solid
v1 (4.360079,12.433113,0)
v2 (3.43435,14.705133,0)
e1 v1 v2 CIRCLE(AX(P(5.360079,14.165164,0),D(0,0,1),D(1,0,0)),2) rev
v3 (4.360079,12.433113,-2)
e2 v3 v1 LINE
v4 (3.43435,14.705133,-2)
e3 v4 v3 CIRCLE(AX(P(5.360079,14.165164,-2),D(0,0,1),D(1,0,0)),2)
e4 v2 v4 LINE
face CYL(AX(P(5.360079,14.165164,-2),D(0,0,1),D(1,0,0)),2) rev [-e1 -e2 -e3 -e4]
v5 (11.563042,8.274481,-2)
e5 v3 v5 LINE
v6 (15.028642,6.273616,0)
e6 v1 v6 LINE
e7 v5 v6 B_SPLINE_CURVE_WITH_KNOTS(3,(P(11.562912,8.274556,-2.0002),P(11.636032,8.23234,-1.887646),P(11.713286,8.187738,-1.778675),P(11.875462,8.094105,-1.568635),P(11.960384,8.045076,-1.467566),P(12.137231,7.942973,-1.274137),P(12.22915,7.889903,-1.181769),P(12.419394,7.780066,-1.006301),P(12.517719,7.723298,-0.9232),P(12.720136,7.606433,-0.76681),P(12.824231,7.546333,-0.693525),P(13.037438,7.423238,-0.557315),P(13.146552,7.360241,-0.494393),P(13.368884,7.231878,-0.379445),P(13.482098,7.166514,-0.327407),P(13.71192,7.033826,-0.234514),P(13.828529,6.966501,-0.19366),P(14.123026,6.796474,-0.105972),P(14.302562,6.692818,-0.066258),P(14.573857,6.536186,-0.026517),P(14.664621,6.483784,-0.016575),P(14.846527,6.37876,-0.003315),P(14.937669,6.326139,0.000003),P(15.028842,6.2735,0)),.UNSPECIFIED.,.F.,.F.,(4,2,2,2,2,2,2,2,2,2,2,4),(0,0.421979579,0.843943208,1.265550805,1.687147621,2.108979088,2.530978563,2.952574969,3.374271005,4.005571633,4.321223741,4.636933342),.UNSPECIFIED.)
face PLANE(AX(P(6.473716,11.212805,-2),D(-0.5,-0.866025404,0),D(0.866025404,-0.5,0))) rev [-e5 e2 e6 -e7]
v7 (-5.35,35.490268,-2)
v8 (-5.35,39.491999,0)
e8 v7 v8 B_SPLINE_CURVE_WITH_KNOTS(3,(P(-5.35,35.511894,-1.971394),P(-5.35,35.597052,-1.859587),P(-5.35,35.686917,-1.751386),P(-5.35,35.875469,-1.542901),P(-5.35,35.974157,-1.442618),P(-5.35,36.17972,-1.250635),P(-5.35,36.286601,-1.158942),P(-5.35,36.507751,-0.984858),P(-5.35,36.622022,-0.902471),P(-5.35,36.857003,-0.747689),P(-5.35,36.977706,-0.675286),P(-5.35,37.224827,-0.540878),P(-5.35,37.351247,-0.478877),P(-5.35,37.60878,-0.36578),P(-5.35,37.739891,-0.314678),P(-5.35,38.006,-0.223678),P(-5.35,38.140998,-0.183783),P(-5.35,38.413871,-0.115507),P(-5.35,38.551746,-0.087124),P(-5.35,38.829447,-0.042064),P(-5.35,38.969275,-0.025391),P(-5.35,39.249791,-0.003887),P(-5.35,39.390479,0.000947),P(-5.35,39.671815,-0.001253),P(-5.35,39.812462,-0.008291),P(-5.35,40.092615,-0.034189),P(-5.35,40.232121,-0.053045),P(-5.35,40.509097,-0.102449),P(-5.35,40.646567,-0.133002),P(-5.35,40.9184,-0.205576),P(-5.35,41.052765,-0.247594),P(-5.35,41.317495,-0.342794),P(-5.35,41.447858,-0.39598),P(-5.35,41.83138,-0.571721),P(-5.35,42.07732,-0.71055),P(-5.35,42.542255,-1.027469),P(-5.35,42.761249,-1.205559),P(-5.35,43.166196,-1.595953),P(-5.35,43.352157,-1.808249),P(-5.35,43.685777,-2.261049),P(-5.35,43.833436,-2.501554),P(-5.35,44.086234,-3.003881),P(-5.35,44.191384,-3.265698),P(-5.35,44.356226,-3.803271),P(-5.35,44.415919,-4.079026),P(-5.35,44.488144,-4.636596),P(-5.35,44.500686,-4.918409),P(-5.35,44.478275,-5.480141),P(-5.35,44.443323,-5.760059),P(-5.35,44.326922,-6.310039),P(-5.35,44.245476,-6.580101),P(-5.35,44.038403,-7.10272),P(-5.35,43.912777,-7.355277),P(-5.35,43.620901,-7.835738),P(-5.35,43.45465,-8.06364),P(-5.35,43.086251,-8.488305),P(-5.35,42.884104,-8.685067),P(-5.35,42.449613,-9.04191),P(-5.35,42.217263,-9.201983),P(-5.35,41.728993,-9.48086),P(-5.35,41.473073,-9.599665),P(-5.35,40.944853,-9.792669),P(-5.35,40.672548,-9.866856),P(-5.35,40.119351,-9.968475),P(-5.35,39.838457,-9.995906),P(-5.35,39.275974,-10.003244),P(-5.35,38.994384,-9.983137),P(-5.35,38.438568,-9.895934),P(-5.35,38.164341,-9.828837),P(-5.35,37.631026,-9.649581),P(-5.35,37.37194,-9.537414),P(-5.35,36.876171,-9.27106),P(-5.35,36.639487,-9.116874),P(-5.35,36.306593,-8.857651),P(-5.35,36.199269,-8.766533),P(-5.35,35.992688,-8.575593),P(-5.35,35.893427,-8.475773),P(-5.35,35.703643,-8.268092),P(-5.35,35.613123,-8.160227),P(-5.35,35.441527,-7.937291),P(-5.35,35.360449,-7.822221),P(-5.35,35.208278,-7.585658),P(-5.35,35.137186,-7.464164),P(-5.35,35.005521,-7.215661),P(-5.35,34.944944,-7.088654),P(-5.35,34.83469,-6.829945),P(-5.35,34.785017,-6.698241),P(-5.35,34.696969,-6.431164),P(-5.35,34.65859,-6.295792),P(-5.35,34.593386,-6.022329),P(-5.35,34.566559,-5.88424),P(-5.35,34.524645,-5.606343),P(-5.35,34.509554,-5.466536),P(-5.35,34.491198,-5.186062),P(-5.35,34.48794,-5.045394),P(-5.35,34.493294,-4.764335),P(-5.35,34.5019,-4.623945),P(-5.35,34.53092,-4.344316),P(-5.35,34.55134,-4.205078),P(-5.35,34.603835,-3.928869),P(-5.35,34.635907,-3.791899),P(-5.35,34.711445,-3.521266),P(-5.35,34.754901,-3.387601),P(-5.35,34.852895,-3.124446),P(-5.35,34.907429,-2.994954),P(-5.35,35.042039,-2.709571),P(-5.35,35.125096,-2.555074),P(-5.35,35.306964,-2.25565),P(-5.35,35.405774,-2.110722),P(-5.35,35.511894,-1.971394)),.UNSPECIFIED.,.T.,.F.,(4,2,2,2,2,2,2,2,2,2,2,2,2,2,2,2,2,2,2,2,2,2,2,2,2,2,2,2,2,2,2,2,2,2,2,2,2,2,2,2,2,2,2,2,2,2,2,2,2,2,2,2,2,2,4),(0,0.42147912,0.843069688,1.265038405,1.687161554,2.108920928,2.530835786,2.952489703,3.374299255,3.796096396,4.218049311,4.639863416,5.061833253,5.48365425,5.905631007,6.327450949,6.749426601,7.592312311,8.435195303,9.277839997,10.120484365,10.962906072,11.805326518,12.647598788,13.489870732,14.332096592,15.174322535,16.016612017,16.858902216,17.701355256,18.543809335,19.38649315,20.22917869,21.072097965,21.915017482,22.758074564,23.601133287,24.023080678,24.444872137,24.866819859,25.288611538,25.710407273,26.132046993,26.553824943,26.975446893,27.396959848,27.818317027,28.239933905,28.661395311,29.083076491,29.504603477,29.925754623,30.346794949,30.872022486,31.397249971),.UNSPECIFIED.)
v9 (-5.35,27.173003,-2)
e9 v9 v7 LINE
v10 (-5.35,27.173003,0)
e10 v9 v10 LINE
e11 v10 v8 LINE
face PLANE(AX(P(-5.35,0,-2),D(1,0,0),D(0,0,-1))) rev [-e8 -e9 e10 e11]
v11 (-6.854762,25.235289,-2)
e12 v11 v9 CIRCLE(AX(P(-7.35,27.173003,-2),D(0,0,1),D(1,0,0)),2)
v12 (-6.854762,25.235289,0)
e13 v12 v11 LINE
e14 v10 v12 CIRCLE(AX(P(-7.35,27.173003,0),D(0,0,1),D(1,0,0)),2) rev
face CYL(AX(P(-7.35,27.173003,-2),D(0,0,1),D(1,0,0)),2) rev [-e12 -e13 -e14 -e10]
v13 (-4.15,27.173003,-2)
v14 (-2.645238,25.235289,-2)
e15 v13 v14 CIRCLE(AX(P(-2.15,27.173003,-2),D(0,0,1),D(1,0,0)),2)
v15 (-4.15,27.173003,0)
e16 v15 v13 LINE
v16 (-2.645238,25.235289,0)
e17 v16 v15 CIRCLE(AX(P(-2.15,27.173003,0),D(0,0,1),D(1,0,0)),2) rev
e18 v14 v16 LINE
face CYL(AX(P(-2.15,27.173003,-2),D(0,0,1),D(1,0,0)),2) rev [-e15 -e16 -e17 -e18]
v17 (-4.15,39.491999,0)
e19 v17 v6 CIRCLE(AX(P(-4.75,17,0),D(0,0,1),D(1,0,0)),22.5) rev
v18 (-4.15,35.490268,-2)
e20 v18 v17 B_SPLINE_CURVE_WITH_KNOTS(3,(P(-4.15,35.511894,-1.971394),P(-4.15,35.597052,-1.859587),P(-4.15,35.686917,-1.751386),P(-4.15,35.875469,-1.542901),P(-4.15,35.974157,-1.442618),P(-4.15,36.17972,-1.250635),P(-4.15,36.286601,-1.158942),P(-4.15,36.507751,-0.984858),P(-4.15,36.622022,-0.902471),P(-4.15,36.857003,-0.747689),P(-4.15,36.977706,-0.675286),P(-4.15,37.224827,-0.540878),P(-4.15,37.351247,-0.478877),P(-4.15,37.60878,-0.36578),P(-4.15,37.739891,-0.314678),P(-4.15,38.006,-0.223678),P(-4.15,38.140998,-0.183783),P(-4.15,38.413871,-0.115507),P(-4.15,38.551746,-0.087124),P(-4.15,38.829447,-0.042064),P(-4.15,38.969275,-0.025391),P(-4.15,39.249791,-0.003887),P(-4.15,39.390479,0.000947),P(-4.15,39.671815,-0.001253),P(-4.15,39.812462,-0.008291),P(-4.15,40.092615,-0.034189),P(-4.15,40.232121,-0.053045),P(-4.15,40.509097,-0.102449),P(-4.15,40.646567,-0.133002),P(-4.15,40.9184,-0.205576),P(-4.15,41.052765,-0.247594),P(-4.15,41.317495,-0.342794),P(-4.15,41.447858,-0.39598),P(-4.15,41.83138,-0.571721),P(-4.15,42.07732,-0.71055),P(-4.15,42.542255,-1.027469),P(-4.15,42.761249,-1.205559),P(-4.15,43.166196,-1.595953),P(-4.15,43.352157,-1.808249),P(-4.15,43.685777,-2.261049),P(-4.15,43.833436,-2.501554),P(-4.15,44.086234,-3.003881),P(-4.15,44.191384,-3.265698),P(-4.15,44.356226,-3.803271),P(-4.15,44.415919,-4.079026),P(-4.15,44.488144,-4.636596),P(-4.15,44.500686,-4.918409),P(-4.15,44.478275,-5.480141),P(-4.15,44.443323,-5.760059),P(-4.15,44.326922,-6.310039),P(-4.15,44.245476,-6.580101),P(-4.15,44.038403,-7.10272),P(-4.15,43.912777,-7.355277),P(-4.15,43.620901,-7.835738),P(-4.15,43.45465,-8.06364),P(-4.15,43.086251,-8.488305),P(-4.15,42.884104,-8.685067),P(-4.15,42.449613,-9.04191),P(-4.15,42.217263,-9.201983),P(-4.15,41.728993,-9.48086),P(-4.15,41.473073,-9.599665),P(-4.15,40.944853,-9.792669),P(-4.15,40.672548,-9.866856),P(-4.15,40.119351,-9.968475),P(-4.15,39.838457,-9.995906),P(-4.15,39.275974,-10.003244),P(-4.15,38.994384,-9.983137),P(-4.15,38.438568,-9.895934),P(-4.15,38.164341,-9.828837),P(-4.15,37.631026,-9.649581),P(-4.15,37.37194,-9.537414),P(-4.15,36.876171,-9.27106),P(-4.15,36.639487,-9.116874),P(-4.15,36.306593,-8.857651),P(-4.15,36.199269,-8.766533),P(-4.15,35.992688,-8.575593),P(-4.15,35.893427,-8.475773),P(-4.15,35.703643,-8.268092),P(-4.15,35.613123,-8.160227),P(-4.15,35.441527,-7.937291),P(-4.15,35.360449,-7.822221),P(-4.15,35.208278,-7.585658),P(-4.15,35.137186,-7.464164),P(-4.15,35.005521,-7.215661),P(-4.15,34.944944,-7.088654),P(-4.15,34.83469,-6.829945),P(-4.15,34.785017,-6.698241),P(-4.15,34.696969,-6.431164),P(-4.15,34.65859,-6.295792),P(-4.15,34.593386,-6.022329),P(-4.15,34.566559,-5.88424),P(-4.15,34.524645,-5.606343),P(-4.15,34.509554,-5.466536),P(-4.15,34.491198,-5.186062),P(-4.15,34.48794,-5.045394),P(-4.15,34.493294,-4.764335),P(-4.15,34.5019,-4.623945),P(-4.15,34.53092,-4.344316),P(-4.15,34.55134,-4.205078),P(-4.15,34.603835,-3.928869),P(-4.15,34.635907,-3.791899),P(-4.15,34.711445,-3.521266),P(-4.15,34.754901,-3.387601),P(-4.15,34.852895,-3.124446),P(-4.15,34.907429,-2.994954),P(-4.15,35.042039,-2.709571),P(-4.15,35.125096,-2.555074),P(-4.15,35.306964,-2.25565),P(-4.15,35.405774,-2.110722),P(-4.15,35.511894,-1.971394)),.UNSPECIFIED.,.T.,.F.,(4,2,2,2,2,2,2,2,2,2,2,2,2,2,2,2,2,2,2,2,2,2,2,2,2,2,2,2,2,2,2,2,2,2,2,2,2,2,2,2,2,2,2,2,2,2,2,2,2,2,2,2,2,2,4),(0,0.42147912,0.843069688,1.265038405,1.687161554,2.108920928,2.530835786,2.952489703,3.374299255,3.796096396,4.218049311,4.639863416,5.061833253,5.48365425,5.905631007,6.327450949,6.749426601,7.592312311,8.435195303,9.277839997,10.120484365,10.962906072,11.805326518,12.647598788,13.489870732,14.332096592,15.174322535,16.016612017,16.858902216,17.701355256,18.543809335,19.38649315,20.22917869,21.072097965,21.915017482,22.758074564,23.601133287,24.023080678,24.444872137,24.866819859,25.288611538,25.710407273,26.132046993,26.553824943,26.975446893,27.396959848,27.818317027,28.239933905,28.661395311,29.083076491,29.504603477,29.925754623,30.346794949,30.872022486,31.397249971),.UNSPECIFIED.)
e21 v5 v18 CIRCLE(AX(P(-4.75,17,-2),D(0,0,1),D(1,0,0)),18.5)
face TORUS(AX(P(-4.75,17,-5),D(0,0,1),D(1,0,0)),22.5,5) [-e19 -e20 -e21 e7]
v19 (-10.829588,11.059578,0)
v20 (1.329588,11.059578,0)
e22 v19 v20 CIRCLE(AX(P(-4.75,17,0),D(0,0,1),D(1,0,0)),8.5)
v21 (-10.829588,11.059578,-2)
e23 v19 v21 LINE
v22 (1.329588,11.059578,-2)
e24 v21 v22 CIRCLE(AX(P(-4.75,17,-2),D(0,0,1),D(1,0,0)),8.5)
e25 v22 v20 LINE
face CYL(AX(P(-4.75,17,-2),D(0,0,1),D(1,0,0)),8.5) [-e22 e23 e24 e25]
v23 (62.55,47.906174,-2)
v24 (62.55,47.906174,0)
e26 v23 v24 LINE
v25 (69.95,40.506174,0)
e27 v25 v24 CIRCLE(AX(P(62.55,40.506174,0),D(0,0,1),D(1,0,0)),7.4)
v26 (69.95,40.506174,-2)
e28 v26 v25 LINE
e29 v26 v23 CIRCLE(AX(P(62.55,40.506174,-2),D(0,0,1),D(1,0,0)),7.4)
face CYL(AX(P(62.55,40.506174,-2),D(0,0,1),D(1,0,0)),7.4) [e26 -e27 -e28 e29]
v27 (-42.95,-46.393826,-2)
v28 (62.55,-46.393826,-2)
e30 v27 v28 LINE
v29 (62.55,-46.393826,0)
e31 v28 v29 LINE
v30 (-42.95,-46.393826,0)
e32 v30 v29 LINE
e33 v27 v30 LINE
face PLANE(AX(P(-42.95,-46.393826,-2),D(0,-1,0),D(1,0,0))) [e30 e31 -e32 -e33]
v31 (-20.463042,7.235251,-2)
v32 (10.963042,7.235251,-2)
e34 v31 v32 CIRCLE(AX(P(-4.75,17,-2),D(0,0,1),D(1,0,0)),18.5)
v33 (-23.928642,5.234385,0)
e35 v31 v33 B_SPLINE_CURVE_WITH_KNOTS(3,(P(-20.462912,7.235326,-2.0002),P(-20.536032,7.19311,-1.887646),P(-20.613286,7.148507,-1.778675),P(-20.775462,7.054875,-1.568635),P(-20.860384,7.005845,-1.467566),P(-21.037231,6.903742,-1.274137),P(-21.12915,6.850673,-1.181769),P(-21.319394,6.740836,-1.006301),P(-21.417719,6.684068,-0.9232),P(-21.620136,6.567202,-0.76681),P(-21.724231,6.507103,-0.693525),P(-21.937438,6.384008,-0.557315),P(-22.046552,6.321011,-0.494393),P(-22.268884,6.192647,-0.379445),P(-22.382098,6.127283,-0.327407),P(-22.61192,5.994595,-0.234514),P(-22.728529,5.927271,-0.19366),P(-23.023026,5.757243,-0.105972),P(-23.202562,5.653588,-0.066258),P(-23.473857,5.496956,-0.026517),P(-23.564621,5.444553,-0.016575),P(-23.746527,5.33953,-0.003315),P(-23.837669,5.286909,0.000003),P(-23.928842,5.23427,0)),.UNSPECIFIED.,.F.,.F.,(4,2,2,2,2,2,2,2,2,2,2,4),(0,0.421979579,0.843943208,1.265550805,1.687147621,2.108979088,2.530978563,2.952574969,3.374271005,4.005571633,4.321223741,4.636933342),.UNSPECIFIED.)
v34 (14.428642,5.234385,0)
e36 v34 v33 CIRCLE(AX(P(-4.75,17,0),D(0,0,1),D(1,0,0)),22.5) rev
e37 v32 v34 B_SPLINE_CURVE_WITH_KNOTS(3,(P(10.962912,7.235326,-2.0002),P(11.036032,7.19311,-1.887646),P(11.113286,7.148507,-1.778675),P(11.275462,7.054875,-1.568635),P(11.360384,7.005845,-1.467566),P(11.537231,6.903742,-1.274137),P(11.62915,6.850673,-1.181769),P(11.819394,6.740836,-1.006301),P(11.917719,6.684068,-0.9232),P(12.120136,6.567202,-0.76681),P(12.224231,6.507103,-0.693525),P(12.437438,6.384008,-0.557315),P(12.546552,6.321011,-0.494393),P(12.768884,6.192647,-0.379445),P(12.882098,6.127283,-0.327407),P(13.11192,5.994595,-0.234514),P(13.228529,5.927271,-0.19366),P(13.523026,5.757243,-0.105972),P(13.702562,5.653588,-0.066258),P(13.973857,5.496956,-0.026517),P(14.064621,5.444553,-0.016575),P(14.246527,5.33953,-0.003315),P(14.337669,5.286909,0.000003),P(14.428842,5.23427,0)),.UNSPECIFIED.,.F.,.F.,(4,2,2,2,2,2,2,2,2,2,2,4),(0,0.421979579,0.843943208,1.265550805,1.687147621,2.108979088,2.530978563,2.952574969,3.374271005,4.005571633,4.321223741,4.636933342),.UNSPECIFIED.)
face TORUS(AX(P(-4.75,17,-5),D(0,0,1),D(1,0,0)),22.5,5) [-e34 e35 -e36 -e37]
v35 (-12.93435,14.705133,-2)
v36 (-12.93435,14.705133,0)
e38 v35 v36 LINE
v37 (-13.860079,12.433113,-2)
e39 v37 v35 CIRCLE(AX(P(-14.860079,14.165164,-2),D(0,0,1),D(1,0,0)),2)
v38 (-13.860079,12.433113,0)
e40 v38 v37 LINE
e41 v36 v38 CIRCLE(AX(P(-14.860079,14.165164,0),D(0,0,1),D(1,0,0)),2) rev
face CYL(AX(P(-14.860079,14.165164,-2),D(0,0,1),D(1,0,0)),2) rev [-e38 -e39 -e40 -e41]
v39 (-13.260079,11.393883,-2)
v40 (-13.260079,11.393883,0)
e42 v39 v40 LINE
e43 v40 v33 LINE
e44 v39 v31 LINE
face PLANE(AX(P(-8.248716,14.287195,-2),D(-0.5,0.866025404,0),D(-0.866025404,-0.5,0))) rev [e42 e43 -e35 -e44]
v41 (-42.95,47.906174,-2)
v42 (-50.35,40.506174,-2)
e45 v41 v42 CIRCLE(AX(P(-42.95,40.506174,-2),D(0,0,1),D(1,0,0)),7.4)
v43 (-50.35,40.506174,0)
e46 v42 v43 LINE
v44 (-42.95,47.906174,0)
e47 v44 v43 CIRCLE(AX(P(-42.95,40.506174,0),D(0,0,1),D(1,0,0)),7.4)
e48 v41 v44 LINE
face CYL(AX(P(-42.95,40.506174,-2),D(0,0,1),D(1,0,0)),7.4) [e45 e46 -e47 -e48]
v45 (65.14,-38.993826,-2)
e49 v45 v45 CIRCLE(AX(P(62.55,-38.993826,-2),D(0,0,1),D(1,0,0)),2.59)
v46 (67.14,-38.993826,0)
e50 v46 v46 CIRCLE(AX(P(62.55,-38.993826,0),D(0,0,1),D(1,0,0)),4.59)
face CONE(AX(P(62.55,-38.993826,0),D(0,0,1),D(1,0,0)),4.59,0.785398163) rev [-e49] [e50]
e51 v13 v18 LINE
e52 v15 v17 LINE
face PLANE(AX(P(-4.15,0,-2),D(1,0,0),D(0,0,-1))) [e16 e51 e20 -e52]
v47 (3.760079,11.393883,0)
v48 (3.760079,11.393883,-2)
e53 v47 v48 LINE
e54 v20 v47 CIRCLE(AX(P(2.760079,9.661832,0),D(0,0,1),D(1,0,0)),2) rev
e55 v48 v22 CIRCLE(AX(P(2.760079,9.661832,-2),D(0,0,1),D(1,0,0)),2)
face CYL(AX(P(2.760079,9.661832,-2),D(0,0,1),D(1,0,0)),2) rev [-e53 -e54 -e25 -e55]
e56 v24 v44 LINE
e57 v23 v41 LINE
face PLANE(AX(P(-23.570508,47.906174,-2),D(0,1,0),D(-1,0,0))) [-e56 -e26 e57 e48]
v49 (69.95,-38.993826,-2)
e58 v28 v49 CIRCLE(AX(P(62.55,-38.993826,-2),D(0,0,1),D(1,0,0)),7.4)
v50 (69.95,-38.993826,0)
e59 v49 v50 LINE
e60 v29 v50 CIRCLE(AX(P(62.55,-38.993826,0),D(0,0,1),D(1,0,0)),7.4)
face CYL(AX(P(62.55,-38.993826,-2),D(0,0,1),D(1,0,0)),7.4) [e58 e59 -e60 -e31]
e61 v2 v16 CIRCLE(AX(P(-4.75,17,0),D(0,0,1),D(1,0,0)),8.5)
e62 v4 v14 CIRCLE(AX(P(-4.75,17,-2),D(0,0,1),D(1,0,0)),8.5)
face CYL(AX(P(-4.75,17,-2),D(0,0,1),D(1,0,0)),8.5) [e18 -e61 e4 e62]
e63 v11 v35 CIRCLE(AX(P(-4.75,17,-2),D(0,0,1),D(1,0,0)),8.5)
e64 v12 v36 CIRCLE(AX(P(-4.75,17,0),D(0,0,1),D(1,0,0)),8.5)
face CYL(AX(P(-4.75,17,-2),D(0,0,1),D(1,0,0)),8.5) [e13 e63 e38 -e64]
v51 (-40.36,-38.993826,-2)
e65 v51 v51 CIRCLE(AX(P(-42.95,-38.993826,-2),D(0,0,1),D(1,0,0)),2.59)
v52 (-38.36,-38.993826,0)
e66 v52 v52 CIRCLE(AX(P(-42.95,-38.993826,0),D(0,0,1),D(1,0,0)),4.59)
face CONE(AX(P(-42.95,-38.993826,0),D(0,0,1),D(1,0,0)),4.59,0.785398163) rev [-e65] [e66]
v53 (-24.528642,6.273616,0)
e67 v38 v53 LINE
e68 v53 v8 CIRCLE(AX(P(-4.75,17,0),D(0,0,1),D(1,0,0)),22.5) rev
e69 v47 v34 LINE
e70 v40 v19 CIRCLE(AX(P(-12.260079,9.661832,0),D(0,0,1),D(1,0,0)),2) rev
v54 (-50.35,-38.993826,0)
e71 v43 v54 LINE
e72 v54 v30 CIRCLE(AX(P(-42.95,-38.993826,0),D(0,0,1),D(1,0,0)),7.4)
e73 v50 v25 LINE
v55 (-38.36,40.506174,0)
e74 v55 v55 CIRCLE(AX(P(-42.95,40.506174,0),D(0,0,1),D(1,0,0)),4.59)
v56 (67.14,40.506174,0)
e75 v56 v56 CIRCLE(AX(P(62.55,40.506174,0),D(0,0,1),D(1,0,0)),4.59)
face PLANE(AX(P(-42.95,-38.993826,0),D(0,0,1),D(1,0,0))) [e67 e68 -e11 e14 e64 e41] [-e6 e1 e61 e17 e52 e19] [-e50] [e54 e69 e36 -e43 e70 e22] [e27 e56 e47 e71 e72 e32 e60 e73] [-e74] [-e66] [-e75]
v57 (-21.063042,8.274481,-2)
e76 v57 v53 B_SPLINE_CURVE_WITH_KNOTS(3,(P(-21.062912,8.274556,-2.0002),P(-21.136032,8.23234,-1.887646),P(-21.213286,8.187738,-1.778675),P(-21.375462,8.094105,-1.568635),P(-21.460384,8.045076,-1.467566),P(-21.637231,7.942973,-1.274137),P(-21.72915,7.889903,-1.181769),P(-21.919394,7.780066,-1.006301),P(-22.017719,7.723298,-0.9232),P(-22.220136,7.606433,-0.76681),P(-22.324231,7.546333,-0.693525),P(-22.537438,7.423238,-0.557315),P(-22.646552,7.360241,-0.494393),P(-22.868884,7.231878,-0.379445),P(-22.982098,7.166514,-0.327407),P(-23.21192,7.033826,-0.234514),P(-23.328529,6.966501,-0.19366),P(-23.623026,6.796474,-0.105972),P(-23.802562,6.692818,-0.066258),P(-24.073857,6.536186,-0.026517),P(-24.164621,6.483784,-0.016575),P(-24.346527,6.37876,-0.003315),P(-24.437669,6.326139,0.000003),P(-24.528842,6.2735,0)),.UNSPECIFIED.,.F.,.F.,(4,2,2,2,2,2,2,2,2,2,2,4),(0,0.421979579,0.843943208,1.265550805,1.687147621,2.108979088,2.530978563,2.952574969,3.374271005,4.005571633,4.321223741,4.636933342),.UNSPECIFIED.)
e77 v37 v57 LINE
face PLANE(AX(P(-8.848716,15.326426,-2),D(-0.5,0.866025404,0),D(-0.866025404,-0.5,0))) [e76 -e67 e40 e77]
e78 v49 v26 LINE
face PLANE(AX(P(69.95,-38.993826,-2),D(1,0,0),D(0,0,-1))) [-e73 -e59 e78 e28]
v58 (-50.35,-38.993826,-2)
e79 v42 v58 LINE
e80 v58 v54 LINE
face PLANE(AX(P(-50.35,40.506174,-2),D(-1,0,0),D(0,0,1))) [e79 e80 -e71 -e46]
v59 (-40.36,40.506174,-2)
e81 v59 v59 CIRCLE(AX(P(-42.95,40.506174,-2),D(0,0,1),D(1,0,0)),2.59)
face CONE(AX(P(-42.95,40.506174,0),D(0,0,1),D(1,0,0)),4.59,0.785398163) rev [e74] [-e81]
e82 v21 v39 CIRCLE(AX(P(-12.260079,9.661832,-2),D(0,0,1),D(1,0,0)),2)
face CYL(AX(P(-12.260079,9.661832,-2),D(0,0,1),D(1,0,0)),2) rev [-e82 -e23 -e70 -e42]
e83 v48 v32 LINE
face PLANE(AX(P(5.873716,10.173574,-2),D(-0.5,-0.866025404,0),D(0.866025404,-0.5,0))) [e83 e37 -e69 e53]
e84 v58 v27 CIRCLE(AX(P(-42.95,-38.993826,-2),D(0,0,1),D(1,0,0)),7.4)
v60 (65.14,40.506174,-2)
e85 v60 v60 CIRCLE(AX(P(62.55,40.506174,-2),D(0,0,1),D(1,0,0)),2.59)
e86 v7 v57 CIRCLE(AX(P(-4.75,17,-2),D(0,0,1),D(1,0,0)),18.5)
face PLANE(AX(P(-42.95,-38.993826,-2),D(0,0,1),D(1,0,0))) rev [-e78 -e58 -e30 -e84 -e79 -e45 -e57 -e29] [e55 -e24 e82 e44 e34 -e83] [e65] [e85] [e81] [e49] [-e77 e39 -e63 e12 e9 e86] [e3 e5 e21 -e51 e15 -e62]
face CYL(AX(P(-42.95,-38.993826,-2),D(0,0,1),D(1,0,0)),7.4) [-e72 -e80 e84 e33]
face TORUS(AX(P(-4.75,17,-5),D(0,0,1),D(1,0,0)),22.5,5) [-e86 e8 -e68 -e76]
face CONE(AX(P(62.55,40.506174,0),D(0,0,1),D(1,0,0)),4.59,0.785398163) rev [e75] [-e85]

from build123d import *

# Parameters (mm, degrees)
SKETCH1_R                                    = 18.5
SKETCH1_R_2                                  = 2.125
MAIN_DEPTH                                   = 2
INLET_FILLET_R                               = 5
SKETCH20_R                                   = 8.5
FAN_PROTECTION_RIBS_DEPTH                    = 2
FAN_PROTECTION_RIBS_FILLETS_R                = 2
CSK_FOR_M4_HEX_SOCKET_COUNTERSUNK_HE_2_COUNT = 2
CSK_FOR_M4_HEX_SOCKET_COUNTERSUNK_HE_2_PITCH = 79.5
CSK_FOR_M4_HEX_SOCKET_COUNTERSUNK_HE_3_COUNT = 2
CSK_FOR_M4_HEX_SOCKET_COUNTERSUNK_HE_3_PITCH = 105.5
CSK_FOR_M4_HEX_SOCKET_COUNTERSUNK_HE_4_COUNT = 2
CSK_FOR_M4_HEX_SOCKET_COUNTERSUNK_HE_4_PITCH = 132.10034065


with BuildPart() as part:
    # Sketch1 → Main (new body)
    with BuildSketch(Plane.XY):
        with BuildLine():
            Line((-42.95, -46.393826455), (62.55, -46.393826455))
            ThreePointArc((62.55, -46.393826455), (67.782590181, -44.226416636), (69.95, -38.993826455))
            Line((69.95, -38.993826455), (69.95, 40.506173545))
            ThreePointArc((69.95, 40.506173545), (67.782590181, 45.738763726), (62.55, 47.906173545))
            Line((62.55, 47.906173545), (11.070508076, 47.906173545))
            Line((11.070508076, 47.906173545), (-23.570508076, 47.906173545))
            Line((-23.570508076, 47.906173545), (-42.95, 47.906173545))
            ThreePointArc((-42.95, 47.906173545), (-48.182590181, 45.738763726), (-50.35, 40.506173545))
            Line((-50.35, 40.506173545), (-50.35, -38.993826455))
            ThreePointArc((-50.35, -38.993826455), (-48.182590181, -44.226416636), (-42.95, -46.393826455))
        make_face()
        with Locations((-4.75, 17)):
            Circle(SKETCH1_R, mode=Mode.SUBTRACT)
        with Locations((-42.95, 40.506173545)):
            Circle(SKETCH1_R_2, mode=Mode.SUBTRACT)
        with Locations((-42.95, -38.993826455)):
            Circle(SKETCH1_R_2, mode=Mode.SUBTRACT)
        with Locations((62.55, 40.506173545)):
            Circle(SKETCH1_R_2, mode=Mode.SUBTRACT)
        with Locations((62.55, -38.993826455)):
            Circle(SKETCH1_R_2, mode=Mode.SUBTRACT)
    extrude(amount=-MAIN_DEPTH)

    # Inlet Fillet
    # the kernel refuses this fillet: 5 mm, written as the material it takes off along each edge
    with BuildSketch(Plane(origin=(-4.75, 17, 0), x_dir=(1, 0, 0), z_dir=(0, -1, 0))) as inlet_fillet_piece_1:
        with BuildLine():
            CenterArc((22.5, -5), INLET_FILLET_R, 90, 53.130102354)
            Line((22.5, 0), (22.5, 0.1))
            Line((22.5, 0.1), (18.5, 0.1))
            Line((18.5, 0.1), (18.4, 0))
            ThreePointArc((18.4, 0), (18.4, -1), (18.42, -1.94))
            Line((18.42, -1.94), (18.5, -2))
        make_face()
    revolve(axis=Axis((-4.75, 17, 0), (0, 0, 1)), mode=Mode.SUBTRACT)

    # Sketch20 → Fan Protection Ribs (add, through all)
    with BuildSketch(Plane.XY):
        with Locations((-4.75, 17)):
            Circle(SKETCH20_R)
        with BuildLine():
            ThreePointArc((-5.35, 25.478797084), (-4.75, 25.5), (-4.15, 25.478797084))
            Line((-4.15, 25.478797084), (-4.15, 39.491998577))
            ThreePointArc((-4.15, 39.491998577), (-4.75, 39.5), (-5.35, 39.491998577))
            Line((-5.35, 39.491998577), (-5.35, 25.478797084))
        make_face()
        with BuildLine():
            Line((15.02864215, 6.273615954), (2.892853669, 13.2802167))
            ThreePointArc((2.892853669, 13.2802167), (2.611215932, 12.75), (2.292853669, 12.240986215))
            Line((2.292853669, 12.240986215), (14.42864215, 5.234385469))
            ThreePointArc((14.42864215, 5.234385469), (14.735571585, 5.75), (15.02864215, 6.273615954))
        make_face()
        with BuildLine():
            ThreePointArc((-11.792853669, 12.240986215), (-12.111215932, 12.75), (-12.392853669, 13.2802167))
            Line((-12.392853669, 13.2802167), (-24.52864215, 6.273615954))
            ThreePointArc((-24.52864215, 6.273615954), (-24.235571585, 5.75), (-23.92864215, 5.234385469))
            Line((-23.92864215, 5.234385469), (-11.792853669, 12.240986215))
        make_face()
    extrude(amount=-FAN_PROTECTION_RIBS_DEPTH)

    # Fan Protection Ribs Fillets
    fan_protection_ribs_fillets_edges = [part.edges().sort_by_distance(p)[0] for p in [
        (-4.15, 25.478797084, -1),
        (2.892853669, 13.2802167, -1),
        (2.292853669, 12.240986215, -1),
        (-11.792853669, 12.240986215, -1),
        (-12.392853669, 13.2802167, -1),
        (-5.35, 25.478797084, -1),
    ]]
    fillet(fan_protection_ribs_fillets_edges, radius=FAN_PROTECTION_RIBS_FILLETS_R)

    # Sketch23 → CSK for M4 Hex Socket Countersunk Head Screw3 (revolve, cut)
    with BuildSketch(Plane(origin=(-42.95, 40.506173545, 0), x_dir=(0, -1, 0), z_dir=(1, 0, 0))):
        Polygon((0, 0), (0, 2), (2.15, 2), (2.15, 2.44), (4.59, 0), align=None)
    csk_for_m4_hex_socket_countersunk_head_s = revolve(axis=Axis((-42.95, 40.506173545, 6.35), (0, 0, -1)), mode=Mode.SUBTRACT)

    # CSK for M4 Hex Socket Countersunk He 2: CSK for M4 Hex Socket Countersunk Head Screw3 ×2
    with Locations(*[(0, -i * CSK_FOR_M4_HEX_SOCKET_COUNTERSUNK_HE_2_PITCH, 0) for i in range(1, CSK_FOR_M4_HEX_SOCKET_COUNTERSUNK_HE_2_COUNT)]):
        add(csk_for_m4_hex_socket_countersunk_head_s, mode=Mode.SUBTRACT)

    # CSK for M4 Hex Socket Countersunk He 3: CSK for M4 Hex Socket Countersunk Head Screw3 ×2
    with Locations(*[(i * CSK_FOR_M4_HEX_SOCKET_COUNTERSUNK_HE_3_PITCH, 0, 0) for i in range(1, CSK_FOR_M4_HEX_SOCKET_COUNTERSUNK_HE_3_COUNT)]):
        add(csk_for_m4_hex_socket_countersunk_head_s, mode=Mode.SUBTRACT)

    # CSK for M4 Hex Socket Countersunk He 4: CSK for M4 Hex Socket Countersunk Head Screw3 ×2
    with Locations(*[Vector(0.7986353364447739, -0.6018152535303031, 0) * (i * CSK_FOR_M4_HEX_SOCKET_COUNTERSUNK_HE_4_PITCH) for i in range(1, CSK_FOR_M4_HEX_SOCKET_COUNTERSUNK_HE_4_COUNT)]):
        add(csk_for_m4_hex_socket_countersunk_head_s, mode=Mode.SUBTRACT)


solid = part.part
